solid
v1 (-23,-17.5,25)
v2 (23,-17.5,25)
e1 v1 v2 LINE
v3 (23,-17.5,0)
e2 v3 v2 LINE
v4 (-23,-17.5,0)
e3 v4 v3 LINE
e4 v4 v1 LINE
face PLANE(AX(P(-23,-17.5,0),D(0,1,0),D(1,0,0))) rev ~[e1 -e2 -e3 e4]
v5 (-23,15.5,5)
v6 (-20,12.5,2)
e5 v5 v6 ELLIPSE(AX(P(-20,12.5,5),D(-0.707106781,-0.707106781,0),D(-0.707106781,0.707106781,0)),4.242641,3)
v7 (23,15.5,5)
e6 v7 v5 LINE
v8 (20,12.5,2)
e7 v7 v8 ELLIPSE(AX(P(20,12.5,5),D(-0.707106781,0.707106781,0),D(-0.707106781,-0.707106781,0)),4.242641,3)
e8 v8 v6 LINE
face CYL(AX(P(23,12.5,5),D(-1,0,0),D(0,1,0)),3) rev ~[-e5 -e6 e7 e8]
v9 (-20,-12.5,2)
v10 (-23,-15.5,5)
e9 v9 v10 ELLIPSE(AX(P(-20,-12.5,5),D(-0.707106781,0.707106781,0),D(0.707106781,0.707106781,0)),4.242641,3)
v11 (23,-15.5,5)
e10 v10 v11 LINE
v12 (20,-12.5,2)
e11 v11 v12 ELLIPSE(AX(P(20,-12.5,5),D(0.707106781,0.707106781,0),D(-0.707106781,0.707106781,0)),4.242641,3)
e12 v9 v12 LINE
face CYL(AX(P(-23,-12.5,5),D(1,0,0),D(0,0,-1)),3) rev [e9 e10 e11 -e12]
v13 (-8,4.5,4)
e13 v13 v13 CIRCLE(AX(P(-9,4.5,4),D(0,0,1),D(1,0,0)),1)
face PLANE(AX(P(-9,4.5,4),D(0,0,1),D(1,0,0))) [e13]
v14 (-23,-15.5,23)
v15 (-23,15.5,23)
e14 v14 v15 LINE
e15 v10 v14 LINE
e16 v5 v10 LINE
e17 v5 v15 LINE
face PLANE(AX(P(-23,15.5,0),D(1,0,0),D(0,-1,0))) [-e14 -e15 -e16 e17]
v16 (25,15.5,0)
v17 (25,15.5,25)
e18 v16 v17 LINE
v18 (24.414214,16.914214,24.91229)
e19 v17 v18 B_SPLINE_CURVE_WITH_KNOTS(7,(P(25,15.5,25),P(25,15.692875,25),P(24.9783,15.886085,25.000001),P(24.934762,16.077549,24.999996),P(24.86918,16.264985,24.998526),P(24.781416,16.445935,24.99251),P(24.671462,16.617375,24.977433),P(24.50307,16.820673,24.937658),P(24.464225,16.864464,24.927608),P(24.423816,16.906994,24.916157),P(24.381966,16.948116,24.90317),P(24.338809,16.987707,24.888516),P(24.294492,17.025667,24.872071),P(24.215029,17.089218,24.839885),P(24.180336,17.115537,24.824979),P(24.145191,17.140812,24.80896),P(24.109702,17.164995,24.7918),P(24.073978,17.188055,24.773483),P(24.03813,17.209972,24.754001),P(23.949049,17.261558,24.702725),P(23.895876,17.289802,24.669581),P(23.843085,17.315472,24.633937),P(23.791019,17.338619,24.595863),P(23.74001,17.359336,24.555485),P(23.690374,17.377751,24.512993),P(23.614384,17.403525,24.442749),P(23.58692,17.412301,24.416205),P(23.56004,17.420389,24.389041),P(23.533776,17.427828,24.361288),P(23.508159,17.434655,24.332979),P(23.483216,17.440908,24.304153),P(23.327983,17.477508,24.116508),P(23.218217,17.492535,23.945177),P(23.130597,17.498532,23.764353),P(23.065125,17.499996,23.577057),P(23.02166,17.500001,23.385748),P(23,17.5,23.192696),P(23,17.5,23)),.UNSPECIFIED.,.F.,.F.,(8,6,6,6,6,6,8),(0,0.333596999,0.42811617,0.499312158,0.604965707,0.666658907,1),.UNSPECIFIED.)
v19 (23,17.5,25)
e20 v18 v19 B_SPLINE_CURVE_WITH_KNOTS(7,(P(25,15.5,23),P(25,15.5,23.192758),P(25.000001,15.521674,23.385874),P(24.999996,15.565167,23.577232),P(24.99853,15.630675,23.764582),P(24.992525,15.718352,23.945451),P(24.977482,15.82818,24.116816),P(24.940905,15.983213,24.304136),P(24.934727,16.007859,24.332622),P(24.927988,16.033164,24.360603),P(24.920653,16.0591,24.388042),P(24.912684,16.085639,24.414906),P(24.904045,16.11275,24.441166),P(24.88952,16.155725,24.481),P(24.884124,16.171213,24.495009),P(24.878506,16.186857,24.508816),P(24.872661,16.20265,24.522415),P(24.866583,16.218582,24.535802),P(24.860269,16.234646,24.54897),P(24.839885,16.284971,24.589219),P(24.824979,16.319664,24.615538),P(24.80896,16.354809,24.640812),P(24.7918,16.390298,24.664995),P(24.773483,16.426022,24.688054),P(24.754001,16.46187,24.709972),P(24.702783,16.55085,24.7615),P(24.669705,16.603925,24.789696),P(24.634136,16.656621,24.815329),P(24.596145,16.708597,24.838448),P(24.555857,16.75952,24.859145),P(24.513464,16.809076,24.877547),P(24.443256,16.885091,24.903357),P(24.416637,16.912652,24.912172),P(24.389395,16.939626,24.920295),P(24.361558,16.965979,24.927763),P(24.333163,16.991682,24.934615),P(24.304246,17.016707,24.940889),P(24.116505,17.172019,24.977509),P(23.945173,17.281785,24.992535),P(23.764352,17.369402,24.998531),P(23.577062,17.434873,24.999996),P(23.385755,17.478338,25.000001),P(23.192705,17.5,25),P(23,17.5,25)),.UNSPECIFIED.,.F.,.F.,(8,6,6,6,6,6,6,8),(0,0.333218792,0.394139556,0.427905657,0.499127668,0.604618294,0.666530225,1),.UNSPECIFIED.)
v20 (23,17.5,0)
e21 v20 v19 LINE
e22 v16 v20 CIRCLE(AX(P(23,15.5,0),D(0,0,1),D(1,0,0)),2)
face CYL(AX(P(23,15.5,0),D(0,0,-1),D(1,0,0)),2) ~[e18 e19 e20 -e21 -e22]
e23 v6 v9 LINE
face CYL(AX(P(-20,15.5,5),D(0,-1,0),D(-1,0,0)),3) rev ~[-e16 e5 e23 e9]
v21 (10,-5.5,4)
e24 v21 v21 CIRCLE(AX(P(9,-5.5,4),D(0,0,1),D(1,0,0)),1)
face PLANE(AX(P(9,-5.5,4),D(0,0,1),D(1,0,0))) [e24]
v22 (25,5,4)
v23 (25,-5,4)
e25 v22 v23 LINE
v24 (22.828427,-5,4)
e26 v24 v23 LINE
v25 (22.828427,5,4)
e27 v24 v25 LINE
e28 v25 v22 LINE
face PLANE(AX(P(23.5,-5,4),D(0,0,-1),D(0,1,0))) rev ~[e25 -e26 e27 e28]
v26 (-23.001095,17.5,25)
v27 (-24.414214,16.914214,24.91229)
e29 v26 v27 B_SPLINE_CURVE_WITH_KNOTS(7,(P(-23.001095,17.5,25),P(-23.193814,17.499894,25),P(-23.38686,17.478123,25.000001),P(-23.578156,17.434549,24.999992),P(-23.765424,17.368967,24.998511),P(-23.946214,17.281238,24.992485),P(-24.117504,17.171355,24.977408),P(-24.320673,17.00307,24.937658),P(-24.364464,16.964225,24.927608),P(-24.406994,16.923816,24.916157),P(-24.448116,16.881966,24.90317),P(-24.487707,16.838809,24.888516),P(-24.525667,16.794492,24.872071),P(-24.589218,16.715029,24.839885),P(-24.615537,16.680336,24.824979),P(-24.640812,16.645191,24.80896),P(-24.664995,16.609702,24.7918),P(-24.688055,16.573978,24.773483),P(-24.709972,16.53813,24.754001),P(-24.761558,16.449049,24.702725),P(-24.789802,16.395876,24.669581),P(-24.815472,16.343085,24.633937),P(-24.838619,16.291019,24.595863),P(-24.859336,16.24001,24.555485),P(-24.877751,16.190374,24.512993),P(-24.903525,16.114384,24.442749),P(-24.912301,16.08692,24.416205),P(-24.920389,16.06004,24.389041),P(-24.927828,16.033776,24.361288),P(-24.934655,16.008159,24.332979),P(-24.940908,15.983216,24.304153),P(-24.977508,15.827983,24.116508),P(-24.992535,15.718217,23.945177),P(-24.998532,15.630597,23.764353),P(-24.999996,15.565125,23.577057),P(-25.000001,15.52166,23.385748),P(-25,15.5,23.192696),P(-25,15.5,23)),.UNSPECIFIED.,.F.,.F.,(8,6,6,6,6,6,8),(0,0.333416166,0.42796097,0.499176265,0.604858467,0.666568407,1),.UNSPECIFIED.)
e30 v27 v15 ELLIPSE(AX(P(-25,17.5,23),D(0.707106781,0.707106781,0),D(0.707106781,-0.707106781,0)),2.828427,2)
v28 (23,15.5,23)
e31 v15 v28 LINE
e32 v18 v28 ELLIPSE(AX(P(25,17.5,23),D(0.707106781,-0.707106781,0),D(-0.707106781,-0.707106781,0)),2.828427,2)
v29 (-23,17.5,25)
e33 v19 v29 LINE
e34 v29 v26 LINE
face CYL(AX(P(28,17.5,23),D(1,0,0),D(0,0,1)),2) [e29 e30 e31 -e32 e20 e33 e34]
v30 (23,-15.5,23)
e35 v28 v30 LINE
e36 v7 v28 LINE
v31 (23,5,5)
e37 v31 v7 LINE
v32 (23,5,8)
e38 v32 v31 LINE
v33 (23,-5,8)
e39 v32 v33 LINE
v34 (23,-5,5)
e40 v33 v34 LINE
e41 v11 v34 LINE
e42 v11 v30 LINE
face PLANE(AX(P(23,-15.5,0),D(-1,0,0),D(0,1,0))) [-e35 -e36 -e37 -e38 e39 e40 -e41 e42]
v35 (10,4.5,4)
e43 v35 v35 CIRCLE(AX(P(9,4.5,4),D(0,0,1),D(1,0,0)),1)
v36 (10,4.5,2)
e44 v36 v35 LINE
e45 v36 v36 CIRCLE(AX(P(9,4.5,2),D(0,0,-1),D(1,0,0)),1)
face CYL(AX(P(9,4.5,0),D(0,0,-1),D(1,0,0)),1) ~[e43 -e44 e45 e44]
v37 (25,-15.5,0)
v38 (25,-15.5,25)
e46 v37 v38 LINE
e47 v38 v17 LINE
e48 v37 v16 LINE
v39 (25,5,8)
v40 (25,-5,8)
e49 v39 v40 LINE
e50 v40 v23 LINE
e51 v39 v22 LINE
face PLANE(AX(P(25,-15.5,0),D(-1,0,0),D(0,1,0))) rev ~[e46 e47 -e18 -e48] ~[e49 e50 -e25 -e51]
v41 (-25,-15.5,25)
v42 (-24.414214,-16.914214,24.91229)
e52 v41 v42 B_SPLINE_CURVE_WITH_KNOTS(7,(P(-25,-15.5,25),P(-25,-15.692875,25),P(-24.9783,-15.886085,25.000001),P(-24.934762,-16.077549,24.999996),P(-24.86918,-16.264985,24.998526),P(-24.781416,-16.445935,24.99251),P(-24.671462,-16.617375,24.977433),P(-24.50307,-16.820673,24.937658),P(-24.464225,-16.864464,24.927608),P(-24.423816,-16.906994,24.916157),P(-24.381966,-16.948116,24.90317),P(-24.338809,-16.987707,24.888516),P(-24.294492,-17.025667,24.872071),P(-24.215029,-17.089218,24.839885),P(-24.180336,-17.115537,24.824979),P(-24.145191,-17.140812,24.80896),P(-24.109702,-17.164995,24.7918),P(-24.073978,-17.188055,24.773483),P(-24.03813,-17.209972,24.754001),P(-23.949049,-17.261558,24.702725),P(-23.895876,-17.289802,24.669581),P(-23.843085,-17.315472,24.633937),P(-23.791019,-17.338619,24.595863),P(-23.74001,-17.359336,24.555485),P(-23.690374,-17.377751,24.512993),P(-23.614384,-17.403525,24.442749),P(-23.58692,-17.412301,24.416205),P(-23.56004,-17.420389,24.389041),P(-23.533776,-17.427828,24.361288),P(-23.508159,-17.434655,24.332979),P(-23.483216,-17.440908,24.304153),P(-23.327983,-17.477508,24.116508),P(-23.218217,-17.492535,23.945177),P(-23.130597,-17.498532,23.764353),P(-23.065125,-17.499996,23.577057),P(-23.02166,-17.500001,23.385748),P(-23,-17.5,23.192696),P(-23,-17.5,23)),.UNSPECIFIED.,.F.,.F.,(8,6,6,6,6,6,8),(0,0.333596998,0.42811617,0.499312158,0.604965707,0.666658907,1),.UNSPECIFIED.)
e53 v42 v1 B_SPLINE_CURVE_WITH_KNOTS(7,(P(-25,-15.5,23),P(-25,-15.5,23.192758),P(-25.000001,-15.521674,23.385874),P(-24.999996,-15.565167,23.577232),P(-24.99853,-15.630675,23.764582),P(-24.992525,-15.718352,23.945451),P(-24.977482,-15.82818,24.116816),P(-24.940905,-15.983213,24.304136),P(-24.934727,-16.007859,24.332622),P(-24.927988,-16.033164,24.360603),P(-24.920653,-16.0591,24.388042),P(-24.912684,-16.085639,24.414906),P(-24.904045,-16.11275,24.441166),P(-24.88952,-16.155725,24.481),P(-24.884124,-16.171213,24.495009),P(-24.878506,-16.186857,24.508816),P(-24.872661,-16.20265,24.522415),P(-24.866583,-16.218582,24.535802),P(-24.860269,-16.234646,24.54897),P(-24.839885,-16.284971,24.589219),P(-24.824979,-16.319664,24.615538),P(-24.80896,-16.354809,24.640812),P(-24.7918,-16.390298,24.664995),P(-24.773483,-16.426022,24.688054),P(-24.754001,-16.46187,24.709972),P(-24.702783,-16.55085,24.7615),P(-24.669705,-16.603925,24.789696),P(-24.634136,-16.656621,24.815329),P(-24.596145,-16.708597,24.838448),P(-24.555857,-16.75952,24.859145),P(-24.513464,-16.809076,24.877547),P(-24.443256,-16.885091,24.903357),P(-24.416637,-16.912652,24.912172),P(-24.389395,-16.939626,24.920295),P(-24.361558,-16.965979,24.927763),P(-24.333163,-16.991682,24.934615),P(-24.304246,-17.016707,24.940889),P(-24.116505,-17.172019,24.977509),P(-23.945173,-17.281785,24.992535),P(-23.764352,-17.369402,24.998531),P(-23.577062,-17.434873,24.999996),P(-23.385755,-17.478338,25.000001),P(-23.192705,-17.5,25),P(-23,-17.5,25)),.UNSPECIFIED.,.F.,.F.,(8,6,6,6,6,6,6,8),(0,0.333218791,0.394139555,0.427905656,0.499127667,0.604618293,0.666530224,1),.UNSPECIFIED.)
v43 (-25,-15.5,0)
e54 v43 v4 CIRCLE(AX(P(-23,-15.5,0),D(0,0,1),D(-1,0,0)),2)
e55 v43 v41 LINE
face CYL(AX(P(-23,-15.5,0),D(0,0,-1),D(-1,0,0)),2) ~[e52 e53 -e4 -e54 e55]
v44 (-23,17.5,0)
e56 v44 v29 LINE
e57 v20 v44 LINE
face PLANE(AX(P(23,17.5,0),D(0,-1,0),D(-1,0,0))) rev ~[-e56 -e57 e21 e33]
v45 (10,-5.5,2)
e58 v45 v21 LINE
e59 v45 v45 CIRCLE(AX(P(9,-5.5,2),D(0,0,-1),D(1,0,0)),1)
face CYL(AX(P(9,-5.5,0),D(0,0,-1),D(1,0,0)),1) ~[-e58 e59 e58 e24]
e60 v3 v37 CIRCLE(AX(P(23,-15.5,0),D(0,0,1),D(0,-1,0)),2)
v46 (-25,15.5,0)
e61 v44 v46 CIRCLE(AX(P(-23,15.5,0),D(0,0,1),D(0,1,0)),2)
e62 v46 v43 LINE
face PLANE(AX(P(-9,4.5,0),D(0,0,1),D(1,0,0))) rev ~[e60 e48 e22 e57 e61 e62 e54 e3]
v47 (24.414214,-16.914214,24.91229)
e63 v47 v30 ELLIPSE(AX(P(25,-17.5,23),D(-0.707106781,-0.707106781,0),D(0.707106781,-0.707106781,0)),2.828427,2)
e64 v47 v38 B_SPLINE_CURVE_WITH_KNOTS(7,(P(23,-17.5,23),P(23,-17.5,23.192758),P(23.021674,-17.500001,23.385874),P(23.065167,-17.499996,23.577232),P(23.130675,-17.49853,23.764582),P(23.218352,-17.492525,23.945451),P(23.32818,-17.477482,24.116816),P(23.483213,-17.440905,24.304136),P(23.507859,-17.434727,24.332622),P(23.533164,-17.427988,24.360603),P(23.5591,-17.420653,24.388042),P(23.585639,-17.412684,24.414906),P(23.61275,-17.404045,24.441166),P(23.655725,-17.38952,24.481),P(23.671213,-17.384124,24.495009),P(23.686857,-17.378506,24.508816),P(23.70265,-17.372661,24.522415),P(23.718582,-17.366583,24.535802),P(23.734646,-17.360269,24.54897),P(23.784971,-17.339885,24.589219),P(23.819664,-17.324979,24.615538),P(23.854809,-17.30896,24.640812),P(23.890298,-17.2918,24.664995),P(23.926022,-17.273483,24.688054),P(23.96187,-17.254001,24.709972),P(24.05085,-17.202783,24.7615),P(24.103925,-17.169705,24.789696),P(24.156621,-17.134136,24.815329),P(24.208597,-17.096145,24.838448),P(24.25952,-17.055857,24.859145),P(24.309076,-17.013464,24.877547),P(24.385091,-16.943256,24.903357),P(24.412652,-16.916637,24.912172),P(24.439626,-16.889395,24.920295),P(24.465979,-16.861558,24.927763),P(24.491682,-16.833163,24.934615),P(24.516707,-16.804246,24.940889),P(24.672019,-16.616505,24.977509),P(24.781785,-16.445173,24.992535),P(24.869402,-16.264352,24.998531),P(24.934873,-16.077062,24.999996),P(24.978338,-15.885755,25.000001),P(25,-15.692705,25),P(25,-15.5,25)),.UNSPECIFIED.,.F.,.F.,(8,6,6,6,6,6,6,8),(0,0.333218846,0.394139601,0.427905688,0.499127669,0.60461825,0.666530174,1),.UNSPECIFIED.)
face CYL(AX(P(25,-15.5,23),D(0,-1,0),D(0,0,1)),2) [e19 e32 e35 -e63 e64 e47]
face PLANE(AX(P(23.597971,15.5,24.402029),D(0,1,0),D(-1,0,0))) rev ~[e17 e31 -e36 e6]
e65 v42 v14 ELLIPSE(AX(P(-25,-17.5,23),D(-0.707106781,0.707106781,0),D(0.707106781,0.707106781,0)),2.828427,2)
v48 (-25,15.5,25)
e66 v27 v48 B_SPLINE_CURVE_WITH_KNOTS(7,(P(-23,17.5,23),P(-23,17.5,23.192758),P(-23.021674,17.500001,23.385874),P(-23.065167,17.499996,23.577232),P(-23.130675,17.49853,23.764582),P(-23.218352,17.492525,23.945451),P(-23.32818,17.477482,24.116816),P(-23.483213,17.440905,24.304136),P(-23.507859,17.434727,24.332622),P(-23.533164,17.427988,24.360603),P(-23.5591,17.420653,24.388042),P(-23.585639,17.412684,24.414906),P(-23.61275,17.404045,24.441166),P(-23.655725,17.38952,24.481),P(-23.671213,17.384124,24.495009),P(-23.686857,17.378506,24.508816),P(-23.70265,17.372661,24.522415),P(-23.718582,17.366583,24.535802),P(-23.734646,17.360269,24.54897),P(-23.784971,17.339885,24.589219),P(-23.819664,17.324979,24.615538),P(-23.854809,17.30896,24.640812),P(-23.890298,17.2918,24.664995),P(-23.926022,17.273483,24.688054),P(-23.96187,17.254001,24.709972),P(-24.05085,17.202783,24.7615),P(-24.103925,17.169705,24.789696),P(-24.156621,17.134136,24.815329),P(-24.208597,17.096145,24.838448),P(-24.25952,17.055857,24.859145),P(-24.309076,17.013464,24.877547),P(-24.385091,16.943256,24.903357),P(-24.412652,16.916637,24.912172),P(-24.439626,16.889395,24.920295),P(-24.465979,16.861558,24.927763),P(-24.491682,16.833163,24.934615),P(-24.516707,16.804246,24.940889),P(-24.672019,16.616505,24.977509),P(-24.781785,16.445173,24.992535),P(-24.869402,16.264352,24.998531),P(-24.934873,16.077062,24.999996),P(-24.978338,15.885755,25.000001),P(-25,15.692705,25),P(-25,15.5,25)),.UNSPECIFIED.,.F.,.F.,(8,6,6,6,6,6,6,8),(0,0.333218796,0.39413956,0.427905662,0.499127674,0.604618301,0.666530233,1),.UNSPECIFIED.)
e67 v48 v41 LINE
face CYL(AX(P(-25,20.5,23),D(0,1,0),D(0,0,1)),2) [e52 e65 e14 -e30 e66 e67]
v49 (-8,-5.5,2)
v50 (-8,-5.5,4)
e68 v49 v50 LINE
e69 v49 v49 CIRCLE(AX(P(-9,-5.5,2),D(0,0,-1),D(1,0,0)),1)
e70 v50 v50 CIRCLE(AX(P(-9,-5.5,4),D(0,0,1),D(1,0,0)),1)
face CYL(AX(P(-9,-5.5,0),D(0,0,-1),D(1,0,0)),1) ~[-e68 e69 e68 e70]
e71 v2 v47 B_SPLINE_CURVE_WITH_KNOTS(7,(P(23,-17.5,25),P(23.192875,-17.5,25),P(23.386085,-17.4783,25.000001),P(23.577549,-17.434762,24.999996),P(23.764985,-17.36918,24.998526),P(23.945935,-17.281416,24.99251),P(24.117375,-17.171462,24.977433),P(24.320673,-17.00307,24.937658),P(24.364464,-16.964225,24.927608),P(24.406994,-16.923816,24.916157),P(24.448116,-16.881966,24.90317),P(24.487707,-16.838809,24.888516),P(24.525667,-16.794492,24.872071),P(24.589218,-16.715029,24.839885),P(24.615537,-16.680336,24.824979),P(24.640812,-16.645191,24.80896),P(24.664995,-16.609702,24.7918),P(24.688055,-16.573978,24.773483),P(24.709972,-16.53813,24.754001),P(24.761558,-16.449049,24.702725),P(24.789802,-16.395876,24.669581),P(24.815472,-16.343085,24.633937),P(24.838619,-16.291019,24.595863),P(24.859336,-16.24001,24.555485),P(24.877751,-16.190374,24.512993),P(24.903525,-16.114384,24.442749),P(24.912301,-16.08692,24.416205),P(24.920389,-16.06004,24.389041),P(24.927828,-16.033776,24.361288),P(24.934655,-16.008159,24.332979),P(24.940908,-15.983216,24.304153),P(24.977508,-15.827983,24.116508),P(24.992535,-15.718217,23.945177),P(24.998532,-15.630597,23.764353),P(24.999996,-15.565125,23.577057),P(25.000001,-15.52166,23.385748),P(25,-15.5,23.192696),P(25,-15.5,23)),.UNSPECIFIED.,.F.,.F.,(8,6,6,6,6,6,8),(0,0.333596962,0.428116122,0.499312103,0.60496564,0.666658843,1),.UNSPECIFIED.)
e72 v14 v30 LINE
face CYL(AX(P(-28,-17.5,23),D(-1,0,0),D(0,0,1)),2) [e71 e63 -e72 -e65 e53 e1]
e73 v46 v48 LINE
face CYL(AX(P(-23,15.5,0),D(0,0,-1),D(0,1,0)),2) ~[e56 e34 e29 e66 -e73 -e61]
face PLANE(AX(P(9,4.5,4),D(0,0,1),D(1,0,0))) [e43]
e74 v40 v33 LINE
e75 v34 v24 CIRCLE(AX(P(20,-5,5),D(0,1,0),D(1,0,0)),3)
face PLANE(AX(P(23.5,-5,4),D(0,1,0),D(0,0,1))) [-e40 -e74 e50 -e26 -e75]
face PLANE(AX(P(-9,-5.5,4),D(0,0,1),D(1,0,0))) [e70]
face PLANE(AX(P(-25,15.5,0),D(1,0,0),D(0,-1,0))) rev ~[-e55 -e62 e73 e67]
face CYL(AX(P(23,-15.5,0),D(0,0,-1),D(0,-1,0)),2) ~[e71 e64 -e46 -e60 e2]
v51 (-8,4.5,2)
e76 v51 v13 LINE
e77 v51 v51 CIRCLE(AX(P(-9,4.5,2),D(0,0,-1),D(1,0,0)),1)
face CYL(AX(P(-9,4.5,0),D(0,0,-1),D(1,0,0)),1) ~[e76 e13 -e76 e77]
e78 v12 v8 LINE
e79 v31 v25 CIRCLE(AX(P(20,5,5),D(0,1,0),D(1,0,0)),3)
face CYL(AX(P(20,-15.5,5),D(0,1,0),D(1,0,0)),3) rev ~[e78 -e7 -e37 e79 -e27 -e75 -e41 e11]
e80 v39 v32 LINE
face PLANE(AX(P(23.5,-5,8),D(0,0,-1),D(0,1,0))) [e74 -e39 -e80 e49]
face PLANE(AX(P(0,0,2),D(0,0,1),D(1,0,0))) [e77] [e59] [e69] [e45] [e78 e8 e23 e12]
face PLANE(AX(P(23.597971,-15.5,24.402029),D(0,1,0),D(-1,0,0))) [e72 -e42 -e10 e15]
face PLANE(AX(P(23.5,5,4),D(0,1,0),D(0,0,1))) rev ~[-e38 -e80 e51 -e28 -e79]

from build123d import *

# Parameters (mm, degrees)
F1_DEPTH     = 25
F2_T         = 2
F3_T1_DEPTH  = 31
F3_T3_DEPTH  = 46
F3_T9_DEPTH  = 51
F3_T13_DEPTH = 36
F3_T20_DEPTH = 36
F3_T24_DEPTH = 51
F3_T31_DEPTH = 36
F3_T35_DEPTH = 51
F3_T42_DEPTH = 36
F3_T46_DEPTH = 51
F4_R         = 3
F5_R         = 1
F6_DEPTH     = 4
F8_W         = 10
F8_H         = 4
F9_DEPTH     = 4


# Not quite as in the source:
# - a fillet or chamfer that OpenCascade refuses, or shapes differently, is made with other operations: its cross-section is extruded or revolved along the edge and cut away or added
# - a shell that OpenCascade refuses in one call is made with other operations: the cavity is built on its own and cut out


with BuildPart() as f1:
    # F0 (on Top) → F1 (new body)
    with BuildSketch(Plane.XY):
        with BuildLine():
            ThreePointArc((25, 15.5), (24.4142135624, 16.9142135624), (23, 17.5))
            Line((23, 17.5), (-23, 17.5))
            ThreePointArc((-23, 17.5), (-24.4142135624, 16.9142135624), (-25, 15.5))
            Line((-25, 15.5), (-25, -15.5))
            ThreePointArc((-25, -15.5), (-24.4142135624, -16.9142135624), (-23, -17.5))
            Line((-23, -17.5), (23, -17.5))
            ThreePointArc((23, -17.5), (24.4142135624, -16.9142135624), (25, -15.5))
            Line((25, -15.5), (25, 15.5))
        make_face()
    extrude(amount=F1_DEPTH)

    # F2: shell of thickness 2, made by hand


with BuildPart() as f2_core1:
    # F2_t2: copy of F1
    add(f1.part)

    # the walls: a layer under each face that stays
    f2_faces = [f2_core1.faces().sort_by_distance(p)[0] for p in [
        (0, 17.5, 12.5),
        (-25, 0, 12.5),
        (0, -17.5, 12.5),
        (25, 0, 12.5),
        (0, 0, 0),
    ]]
    thicken(f2_faces, amount=-F2_T, mode=Mode.SUBTRACT)


with BuildPart() as f1_1:
    add(f1.part)

    # what is left inside the walls is the cavity
    f2_cavity = [f2_core1.part.solids().sort_by_distance(p)[0] for p in [
        (0, -5.166667, 2.02),
    ]]
    add(f2_cavity, mode=Mode.SUBTRACT)

    # F3: fillet of radius 2 on 4 edges, made by hand

    # F3_s2 → F3_t1 (cut)
    with BuildSketch(Plane.XZ.offset(-15.5)):
        with BuildLine():
            ThreePointArc((-25, 25), (-23.5857864376, 24.4142135624), (-23, 23))
            Line((-23, 23), (-22.96, 23))
            Line((-22.96, 23), (-22.96, 25.04))
            Line((-22.96, 25.04), (-25, 25.04))
            Line((-25, 25.04), (-25, 25))
        make_face()
        with BuildLine():
            ThreePointArc((25, 25), (23.5857864376, 24.4142135624), (23, 23))
            Line((23, 23), (22.96, 23))
            Line((22.96, 23), (22.96, 25.04))
            Line((22.96, 25.04), (25, 25.04))
            Line((25, 25.04), (25, 25))
        make_face()
    extrude(amount=F3_T1_DEPTH, mode=Mode.SUBTRACT)

    # F3_s4 → F3_t3 (cut)
    with BuildSketch(Plane.YZ.offset(-23)):
        with BuildLine():
            ThreePointArc((17.5, 25), (16.0857864376, 24.4142135624), (15.5, 23))
            Line((15.5, 23), (15.46, 23))
            Line((15.46, 23), (15.46, 25.04))
            Line((15.46, 25.04), (17.5, 25.04))
            Line((17.5, 25.04), (17.5, 25))
        make_face()
        with BuildLine():
            ThreePointArc((-17.5, 25), (-16.0857864376, 24.4142135624), (-15.5, 23))
            Line((-15.5, 23), (-15.46, 23))
            Line((-15.46, 23), (-15.46, 25.04))
            Line((-15.46, 25.04), (-17.5, 25.04))
            Line((-17.5, 25.04), (-17.5, 25))
        make_face()
    extrude(amount=F3_T3_DEPTH, mode=Mode.SUBTRACT)


with BuildPart() as f3_tool7:
    # F3_s8 → F3_t9 (new body)
    with BuildSketch(Plane.YZ.offset(23)):
        with BuildLine():
            ThreePointArc((17.5, 25), (16.0857864376, 24.4142135624), (15.5, 23))
            Line((15.5, 23), (15.46, 23))
            Line((15.46, 23), (15.46, 25.04))
            Line((15.46, 25.04), (17.5, 25.04))
            Line((17.5, 25.04), (17.5, 25))
        make_face()
    extrude(amount=-F3_T9_DEPTH)

    split(bisect_by=Plane.YZ.offset(-23), keep=Keep.BOTTOM)


with BuildPart() as f3_tool11:
    # F3_s12 → F3_t13 (new body)
    with BuildSketch(Plane.XZ.offset(-20.5)):
        with BuildLine():
            ThreePointArc((-25, 25), (-23.5857864376, 24.4142135624), (-23, 23))
            Line((-23, 23), (-22.96, 23))
            Line((-22.96, 23), (-22.96, 25.04))
            Line((-22.96, 25.04), (-25, 25.04))
            Line((-25, 25.04), (-25, 25))
        make_face()
    extrude(amount=F3_T13_DEPTH)

    split(bisect_by=Plane.XZ.offset(-15.5), keep=Keep.BOTTOM)


with BuildPart() as f3_tool7_1:
    add(f3_tool7.part)

    # F3_t15: intersect F3_tool11
    add(f3_tool11.part, mode=Mode.INTERSECT)


with BuildPart() as f1_2:
    add(f1_1.part)

    # F3_t5: cut F3_tool7
    add(f3_tool7_1.part, mode=Mode.SUBTRACT)


with BuildPart() as f3_tool18:
    # F3_s19 → F3_t20 (new body)
    with BuildSketch(Plane.XZ.offset(-15.5)):
        with BuildLine():
            ThreePointArc((-25, 25), (-23.5857864376, 24.4142135624), (-23, 23))
            Line((-23, 23), (-22.96, 23))
            Line((-22.96, 23), (-22.96, 25.04))
            Line((-22.96, 25.04), (-25, 25.04))
            Line((-25, 25.04), (-25, 25))
        make_face()
    extrude(amount=F3_T20_DEPTH)

    split(bisect_by=Plane.XZ.offset(15.5), keep=Keep.TOP)


with BuildPart() as f3_tool22:
    # F3_s23 → F3_t24 (new body)
    with BuildSketch(Plane.YZ.offset(-28)):
        with BuildLine():
            ThreePointArc((-17.5, 25), (-16.0857864376, 24.4142135624), (-15.5, 23))
            Line((-15.5, 23), (-15.46, 23))
            Line((-15.46, 23), (-15.46, 25.04))
            Line((-15.46, 25.04), (-17.5, 25.04))
            Line((-17.5, 25.04), (-17.5, 25))
        make_face()
    extrude(amount=F3_T24_DEPTH)

    split(bisect_by=Plane.YZ.offset(-23), keep=Keep.BOTTOM)


with BuildPart() as f3_tool18_1:
    add(f3_tool18.part)

    # F3_t26: intersect F3_tool22
    add(f3_tool22.part, mode=Mode.INTERSECT)


with BuildPart() as f1_3:
    add(f1_2.part)

    # F3_t16: cut F3_tool18
    add(f3_tool18_1.part, mode=Mode.SUBTRACT)


with BuildPart() as f3_tool29:
    # F3_s30 → F3_t31 (new body)
    with BuildSketch(Plane.XZ.offset(15.5)):
        with BuildLine():
            ThreePointArc((25, 25), (23.5857864376, 24.4142135624), (23, 23))
            Line((23, 23), (22.96, 23))
            Line((22.96, 23), (22.96, 25.04))
            Line((22.96, 25.04), (25, 25.04))
            Line((25, 25.04), (25, 25))
        make_face()
    extrude(amount=-F3_T31_DEPTH)

    split(bisect_by=Plane.XZ.offset(-15.5), keep=Keep.BOTTOM)


with BuildPart() as f3_tool33:
    # F3_s34 → F3_t35 (new body)
    with BuildSketch(Plane.YZ.offset(28)):
        with BuildLine():
            ThreePointArc((17.5, 25), (16.0857864376, 24.4142135624), (15.5, 23))
            Line((15.5, 23), (15.46, 23))
            Line((15.46, 23), (15.46, 25.04))
            Line((15.46, 25.04), (17.5, 25.04))
            Line((17.5, 25.04), (17.5, 25))
        make_face()
    extrude(amount=-F3_T35_DEPTH)

    split(bisect_by=Plane.YZ.offset(23), keep=Keep.TOP)


with BuildPart() as f3_tool29_1:
    add(f3_tool29.part)

    # F3_t37: intersect F3_tool33
    add(f3_tool33.part, mode=Mode.INTERSECT)


with BuildPart() as f1_4:
    add(f1_3.part)

    # F3_t27: cut F3_tool29
    add(f3_tool29_1.part, mode=Mode.SUBTRACT)


with BuildPart() as f3_tool40:
    # F3_s41 → F3_t42 (new body)
    with BuildSketch(Plane.XZ.offset(20.5)):
        with BuildLine():
            ThreePointArc((25, 25), (23.5857864376, 24.4142135624), (23, 23))
            Line((23, 23), (22.96, 23))
            Line((22.96, 23), (22.96, 25.04))
            Line((22.96, 25.04), (25, 25.04))
            Line((25, 25.04), (25, 25))
        make_face()
    extrude(amount=-F3_T42_DEPTH)

    split(bisect_by=Plane.XZ.offset(15.5), keep=Keep.TOP)


with BuildPart() as f3_tool44:
    # F3_s45 → F3_t46 (new body)
    with BuildSketch(Plane.YZ.offset(-23)):
        with BuildLine():
            ThreePointArc((-17.5, 25), (-16.0857864376, 24.4142135624), (-15.5, 23))
            Line((-15.5, 23), (-15.46, 23))
            Line((-15.46, 23), (-15.46, 25.04))
            Line((-15.46, 25.04), (-17.5, 25.04))
            Line((-17.5, 25.04), (-17.5, 25))
        make_face()
    extrude(amount=F3_T46_DEPTH)

    split(bisect_by=Plane.YZ.offset(23), keep=Keep.TOP)


with BuildPart() as f3_tool40_1:
    add(f3_tool40.part)

    # F3_t48: intersect F3_tool44
    add(f3_tool44.part, mode=Mode.INTERSECT)


with BuildPart() as f1_5:
    add(f1_4.part)

    # F3_t38: cut F3_tool40
    add(f3_tool40_1.part, mode=Mode.SUBTRACT)

    # F4
    f4_edges = [f1_5.edges().sort_by_distance(p)[0] for p in [
        (0, 15.5, 2),
        (23, 0, 2),
        (0, -15.5, 2),
        (-23, 0, 2),
    ]]
    fillet(f4_edges, radius=F4_R)

    # F5 (on Top) → F6 (join)
    with BuildSketch(Plane.XY):
        with Locations((-9, 4.5)):
            Circle(F5_R)
        with Locations((-9, -5.5)):
            Circle(F5_R)
        with Locations((9, 4.5)):
            Circle(F5_R)
        with Locations((9, -5.5)):
            Circle(F5_R)
    extrude(amount=F6_DEPTH)

    # F8 (on offset) → F9 (cut, symmetric)
    with BuildSketch(Plane.YZ.offset(23.5)):
        with Locations((0, 6)):
            Rectangle(F8_W, F8_H)
    extrude(amount=F9_DEPTH, both=True, mode=Mode.SUBTRACT)


solid = f1_5.part
